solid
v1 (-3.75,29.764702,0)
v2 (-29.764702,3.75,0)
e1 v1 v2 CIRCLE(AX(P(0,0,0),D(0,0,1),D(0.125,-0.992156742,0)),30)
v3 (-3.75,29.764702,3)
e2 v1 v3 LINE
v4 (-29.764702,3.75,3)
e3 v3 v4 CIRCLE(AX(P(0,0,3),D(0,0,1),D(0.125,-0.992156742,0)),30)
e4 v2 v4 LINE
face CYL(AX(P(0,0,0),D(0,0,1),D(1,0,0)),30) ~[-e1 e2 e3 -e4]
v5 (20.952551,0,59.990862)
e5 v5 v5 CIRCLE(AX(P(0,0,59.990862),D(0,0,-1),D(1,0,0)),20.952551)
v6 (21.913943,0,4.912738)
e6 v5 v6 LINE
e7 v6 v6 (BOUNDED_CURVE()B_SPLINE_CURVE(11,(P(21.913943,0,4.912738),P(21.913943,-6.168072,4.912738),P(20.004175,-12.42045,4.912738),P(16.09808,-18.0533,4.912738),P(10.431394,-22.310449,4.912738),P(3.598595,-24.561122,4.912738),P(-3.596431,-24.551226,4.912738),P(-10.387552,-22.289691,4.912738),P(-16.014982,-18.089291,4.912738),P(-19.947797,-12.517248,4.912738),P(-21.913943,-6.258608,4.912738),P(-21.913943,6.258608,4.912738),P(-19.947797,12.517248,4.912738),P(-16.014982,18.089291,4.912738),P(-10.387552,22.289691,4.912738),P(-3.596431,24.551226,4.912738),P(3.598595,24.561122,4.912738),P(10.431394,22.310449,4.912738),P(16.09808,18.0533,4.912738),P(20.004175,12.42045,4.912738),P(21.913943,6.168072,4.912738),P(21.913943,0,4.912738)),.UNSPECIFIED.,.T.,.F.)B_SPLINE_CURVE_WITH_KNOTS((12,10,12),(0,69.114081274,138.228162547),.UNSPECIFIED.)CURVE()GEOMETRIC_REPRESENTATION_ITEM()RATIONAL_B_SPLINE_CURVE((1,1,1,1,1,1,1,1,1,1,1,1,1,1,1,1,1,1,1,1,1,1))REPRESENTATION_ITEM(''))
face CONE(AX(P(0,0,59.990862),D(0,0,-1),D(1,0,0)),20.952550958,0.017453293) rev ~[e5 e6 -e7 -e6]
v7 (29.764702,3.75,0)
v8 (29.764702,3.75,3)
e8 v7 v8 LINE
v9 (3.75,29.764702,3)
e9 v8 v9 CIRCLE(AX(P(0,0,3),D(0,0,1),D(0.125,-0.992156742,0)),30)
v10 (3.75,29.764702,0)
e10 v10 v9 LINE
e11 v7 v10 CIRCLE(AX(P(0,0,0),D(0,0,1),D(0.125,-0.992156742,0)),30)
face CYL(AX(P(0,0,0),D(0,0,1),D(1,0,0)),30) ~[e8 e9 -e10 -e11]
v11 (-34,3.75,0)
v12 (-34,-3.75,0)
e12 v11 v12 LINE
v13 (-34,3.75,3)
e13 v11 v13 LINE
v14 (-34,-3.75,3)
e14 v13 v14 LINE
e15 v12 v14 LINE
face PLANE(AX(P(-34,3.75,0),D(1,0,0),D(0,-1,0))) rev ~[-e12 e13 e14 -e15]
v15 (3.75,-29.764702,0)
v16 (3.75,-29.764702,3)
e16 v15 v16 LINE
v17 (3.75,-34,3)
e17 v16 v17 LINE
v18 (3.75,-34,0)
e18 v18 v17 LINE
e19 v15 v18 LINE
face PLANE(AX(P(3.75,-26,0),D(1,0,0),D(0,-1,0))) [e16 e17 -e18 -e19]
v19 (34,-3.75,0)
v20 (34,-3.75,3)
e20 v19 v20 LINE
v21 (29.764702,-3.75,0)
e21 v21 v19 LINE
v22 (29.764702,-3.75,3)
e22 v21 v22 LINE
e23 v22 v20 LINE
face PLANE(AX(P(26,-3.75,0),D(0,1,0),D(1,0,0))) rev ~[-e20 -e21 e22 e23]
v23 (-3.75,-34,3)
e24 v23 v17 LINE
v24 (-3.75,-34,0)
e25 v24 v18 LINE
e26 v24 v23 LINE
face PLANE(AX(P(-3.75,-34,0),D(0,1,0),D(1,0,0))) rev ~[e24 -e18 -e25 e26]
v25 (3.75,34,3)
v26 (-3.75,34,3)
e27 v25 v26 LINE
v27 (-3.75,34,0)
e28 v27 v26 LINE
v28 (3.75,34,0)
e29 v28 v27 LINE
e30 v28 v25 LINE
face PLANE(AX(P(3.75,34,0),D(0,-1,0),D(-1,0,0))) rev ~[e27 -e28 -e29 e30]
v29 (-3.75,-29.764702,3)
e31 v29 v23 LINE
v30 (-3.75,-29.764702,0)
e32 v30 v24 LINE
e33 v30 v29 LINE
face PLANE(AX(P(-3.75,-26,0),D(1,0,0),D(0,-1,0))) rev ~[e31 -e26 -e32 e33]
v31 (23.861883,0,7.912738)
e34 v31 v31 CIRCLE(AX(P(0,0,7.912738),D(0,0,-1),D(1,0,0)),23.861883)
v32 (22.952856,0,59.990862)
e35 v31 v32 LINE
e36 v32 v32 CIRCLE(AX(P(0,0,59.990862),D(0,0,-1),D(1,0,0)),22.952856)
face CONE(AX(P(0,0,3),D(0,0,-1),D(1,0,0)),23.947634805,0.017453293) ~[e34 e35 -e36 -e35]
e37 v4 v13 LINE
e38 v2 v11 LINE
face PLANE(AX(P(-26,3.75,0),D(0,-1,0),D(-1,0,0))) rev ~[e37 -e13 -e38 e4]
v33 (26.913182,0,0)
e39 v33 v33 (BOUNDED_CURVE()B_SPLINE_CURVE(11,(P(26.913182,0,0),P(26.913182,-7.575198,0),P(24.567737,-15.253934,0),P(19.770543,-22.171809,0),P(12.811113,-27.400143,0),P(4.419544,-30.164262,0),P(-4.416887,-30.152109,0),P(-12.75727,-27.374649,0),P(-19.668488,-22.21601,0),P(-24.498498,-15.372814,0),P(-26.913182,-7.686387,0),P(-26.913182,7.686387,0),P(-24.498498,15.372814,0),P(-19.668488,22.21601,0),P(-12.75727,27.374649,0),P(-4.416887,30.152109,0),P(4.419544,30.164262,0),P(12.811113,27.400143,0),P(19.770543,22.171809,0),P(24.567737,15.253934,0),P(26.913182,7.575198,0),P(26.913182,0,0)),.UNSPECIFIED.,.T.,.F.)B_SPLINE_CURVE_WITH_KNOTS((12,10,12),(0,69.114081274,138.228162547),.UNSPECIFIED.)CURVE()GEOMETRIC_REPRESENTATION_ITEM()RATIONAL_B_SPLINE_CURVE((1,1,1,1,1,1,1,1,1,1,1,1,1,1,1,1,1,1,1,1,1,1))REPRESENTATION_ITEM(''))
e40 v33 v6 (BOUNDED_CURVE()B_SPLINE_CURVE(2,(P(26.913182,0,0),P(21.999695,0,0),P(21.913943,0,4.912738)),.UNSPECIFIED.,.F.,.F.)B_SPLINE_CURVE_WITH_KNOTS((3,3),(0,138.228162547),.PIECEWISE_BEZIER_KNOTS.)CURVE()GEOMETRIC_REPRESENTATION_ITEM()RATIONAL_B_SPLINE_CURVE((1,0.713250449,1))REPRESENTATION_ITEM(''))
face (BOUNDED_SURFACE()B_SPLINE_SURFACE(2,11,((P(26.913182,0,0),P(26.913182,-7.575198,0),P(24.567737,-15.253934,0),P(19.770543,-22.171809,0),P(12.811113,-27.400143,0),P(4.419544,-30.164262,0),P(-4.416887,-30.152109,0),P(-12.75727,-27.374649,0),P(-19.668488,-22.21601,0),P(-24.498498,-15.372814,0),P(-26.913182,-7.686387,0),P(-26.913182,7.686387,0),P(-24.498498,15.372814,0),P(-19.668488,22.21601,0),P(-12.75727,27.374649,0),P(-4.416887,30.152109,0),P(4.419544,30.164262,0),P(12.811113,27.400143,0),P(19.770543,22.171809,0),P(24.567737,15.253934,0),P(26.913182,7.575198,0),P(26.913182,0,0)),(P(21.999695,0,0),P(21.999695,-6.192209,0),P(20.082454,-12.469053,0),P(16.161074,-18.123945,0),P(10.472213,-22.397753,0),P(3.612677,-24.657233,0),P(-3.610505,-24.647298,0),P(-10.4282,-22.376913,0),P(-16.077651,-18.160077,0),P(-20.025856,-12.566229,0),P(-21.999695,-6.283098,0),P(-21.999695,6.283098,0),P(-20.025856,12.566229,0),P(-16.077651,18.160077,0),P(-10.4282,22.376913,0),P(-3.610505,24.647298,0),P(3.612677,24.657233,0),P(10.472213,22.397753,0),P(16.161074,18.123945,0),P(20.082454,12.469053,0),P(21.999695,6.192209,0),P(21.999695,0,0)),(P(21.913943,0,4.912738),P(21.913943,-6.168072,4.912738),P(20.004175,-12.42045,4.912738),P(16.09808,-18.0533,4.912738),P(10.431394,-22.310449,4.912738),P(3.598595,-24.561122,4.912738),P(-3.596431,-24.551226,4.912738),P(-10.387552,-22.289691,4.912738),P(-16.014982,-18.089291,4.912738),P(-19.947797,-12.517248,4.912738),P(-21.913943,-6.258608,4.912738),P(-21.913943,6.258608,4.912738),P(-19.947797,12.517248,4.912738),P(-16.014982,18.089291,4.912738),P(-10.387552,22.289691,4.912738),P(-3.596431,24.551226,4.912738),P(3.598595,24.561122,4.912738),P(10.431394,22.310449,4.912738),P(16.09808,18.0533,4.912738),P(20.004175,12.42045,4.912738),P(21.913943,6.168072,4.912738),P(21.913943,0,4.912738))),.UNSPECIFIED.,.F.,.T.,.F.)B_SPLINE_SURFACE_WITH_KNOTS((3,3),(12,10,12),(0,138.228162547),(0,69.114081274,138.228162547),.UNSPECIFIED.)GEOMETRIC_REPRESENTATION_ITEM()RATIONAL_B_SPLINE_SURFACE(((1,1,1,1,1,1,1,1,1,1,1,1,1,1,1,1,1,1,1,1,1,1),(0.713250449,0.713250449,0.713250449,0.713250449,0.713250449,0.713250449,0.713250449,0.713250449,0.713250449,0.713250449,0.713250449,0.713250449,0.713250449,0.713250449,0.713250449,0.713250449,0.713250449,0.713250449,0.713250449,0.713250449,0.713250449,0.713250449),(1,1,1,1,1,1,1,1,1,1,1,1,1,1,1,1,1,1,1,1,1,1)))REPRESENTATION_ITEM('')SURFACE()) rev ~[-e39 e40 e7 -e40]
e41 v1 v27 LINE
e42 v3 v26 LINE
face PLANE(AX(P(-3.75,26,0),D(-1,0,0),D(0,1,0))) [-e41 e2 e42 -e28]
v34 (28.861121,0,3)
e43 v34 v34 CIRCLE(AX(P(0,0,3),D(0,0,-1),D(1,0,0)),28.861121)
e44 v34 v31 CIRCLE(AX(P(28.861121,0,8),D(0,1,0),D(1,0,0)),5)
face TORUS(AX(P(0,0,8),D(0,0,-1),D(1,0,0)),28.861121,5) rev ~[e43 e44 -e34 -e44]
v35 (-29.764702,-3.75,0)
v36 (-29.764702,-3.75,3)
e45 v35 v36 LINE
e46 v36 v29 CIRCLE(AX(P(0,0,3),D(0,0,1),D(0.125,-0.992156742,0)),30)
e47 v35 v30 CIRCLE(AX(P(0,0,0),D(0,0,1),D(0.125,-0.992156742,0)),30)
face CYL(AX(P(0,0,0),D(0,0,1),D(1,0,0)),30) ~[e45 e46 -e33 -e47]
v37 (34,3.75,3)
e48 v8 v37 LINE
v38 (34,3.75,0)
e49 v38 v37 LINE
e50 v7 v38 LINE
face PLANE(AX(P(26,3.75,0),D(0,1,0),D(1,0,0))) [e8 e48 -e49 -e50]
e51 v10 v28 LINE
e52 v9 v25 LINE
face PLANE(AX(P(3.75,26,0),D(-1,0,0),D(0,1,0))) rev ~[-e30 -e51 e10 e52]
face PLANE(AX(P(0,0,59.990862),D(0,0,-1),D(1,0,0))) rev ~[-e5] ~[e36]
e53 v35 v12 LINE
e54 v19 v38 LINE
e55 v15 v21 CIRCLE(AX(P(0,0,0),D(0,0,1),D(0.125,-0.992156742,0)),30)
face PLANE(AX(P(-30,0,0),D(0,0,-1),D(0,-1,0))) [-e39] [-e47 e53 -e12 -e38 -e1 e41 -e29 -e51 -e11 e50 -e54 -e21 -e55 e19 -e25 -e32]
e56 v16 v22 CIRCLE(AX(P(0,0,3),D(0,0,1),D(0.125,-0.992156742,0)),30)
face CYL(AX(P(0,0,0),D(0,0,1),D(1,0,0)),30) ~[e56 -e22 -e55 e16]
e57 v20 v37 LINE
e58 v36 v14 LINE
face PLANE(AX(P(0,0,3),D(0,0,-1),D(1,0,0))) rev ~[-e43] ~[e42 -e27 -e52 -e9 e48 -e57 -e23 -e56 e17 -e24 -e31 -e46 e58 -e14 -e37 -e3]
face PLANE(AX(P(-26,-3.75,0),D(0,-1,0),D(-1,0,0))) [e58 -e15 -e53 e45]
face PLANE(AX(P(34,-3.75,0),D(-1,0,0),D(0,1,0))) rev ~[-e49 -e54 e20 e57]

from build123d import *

# Parameters (mm, degrees)
F2_W            = 7.5
F2_H            = 8
F3_DEPTH        = 3
F3_COPIES_COUNT = 4
F4_R            = 5


# Not quite as in the source:
# - a pattern or mirror of a feature is missing from the dataset's text; its kind, count and spacing are read off the source's solid


with BuildPart() as f1:
    # F0 (on Front) → F1 (revolve)
    with BuildSketch(Plane.XZ):
        Polygon((23.9476348052, 3), (24, 0), (30, 0), (30, 3), align=None)
        Polygon((20.9525509577, 59.9908617094), (21.9473301491, 3), (23.9476348052, 3), (22.9528556138, 59.9908617094), align=None)
        Polygon((21.9473301491, 3), (21.9996953439, 0), (24, 0), (23.9476348052, 3), align=None)
    revolve(axis=Axis((0, 0, 53.7638920359), (0, 0, -1)))

    # F2 (on face) → F3 (join)
    with BuildSketch(Plane(origin=(0, 0, 0), x_dir=(1, 0, 0), z_dir=(0, 0, -1))):
        with Locations((0, 30)):
            Rectangle(F2_W, F2_H)
    f3 = extrude(amount=-F3_DEPTH)

    # F3_copies: F3 ×4 about axis
    f3_copies_axis = Axis((0, 0, 0), (0, 0, 1))
    for i in range(1, F3_COPIES_COUNT):
        add(f3.rotate(f3_copies_axis, i * 360 / F3_COPIES_COUNT))

    # F4
    f4_edges = [f1.edges().sort_by_distance(p)[0] for p in [
        (-23.947635, 0, 3),
        (-21.999695, 0, 0),
    ]]
    fillet(f4_edges, radius=F4_R)


solid = f1.part
